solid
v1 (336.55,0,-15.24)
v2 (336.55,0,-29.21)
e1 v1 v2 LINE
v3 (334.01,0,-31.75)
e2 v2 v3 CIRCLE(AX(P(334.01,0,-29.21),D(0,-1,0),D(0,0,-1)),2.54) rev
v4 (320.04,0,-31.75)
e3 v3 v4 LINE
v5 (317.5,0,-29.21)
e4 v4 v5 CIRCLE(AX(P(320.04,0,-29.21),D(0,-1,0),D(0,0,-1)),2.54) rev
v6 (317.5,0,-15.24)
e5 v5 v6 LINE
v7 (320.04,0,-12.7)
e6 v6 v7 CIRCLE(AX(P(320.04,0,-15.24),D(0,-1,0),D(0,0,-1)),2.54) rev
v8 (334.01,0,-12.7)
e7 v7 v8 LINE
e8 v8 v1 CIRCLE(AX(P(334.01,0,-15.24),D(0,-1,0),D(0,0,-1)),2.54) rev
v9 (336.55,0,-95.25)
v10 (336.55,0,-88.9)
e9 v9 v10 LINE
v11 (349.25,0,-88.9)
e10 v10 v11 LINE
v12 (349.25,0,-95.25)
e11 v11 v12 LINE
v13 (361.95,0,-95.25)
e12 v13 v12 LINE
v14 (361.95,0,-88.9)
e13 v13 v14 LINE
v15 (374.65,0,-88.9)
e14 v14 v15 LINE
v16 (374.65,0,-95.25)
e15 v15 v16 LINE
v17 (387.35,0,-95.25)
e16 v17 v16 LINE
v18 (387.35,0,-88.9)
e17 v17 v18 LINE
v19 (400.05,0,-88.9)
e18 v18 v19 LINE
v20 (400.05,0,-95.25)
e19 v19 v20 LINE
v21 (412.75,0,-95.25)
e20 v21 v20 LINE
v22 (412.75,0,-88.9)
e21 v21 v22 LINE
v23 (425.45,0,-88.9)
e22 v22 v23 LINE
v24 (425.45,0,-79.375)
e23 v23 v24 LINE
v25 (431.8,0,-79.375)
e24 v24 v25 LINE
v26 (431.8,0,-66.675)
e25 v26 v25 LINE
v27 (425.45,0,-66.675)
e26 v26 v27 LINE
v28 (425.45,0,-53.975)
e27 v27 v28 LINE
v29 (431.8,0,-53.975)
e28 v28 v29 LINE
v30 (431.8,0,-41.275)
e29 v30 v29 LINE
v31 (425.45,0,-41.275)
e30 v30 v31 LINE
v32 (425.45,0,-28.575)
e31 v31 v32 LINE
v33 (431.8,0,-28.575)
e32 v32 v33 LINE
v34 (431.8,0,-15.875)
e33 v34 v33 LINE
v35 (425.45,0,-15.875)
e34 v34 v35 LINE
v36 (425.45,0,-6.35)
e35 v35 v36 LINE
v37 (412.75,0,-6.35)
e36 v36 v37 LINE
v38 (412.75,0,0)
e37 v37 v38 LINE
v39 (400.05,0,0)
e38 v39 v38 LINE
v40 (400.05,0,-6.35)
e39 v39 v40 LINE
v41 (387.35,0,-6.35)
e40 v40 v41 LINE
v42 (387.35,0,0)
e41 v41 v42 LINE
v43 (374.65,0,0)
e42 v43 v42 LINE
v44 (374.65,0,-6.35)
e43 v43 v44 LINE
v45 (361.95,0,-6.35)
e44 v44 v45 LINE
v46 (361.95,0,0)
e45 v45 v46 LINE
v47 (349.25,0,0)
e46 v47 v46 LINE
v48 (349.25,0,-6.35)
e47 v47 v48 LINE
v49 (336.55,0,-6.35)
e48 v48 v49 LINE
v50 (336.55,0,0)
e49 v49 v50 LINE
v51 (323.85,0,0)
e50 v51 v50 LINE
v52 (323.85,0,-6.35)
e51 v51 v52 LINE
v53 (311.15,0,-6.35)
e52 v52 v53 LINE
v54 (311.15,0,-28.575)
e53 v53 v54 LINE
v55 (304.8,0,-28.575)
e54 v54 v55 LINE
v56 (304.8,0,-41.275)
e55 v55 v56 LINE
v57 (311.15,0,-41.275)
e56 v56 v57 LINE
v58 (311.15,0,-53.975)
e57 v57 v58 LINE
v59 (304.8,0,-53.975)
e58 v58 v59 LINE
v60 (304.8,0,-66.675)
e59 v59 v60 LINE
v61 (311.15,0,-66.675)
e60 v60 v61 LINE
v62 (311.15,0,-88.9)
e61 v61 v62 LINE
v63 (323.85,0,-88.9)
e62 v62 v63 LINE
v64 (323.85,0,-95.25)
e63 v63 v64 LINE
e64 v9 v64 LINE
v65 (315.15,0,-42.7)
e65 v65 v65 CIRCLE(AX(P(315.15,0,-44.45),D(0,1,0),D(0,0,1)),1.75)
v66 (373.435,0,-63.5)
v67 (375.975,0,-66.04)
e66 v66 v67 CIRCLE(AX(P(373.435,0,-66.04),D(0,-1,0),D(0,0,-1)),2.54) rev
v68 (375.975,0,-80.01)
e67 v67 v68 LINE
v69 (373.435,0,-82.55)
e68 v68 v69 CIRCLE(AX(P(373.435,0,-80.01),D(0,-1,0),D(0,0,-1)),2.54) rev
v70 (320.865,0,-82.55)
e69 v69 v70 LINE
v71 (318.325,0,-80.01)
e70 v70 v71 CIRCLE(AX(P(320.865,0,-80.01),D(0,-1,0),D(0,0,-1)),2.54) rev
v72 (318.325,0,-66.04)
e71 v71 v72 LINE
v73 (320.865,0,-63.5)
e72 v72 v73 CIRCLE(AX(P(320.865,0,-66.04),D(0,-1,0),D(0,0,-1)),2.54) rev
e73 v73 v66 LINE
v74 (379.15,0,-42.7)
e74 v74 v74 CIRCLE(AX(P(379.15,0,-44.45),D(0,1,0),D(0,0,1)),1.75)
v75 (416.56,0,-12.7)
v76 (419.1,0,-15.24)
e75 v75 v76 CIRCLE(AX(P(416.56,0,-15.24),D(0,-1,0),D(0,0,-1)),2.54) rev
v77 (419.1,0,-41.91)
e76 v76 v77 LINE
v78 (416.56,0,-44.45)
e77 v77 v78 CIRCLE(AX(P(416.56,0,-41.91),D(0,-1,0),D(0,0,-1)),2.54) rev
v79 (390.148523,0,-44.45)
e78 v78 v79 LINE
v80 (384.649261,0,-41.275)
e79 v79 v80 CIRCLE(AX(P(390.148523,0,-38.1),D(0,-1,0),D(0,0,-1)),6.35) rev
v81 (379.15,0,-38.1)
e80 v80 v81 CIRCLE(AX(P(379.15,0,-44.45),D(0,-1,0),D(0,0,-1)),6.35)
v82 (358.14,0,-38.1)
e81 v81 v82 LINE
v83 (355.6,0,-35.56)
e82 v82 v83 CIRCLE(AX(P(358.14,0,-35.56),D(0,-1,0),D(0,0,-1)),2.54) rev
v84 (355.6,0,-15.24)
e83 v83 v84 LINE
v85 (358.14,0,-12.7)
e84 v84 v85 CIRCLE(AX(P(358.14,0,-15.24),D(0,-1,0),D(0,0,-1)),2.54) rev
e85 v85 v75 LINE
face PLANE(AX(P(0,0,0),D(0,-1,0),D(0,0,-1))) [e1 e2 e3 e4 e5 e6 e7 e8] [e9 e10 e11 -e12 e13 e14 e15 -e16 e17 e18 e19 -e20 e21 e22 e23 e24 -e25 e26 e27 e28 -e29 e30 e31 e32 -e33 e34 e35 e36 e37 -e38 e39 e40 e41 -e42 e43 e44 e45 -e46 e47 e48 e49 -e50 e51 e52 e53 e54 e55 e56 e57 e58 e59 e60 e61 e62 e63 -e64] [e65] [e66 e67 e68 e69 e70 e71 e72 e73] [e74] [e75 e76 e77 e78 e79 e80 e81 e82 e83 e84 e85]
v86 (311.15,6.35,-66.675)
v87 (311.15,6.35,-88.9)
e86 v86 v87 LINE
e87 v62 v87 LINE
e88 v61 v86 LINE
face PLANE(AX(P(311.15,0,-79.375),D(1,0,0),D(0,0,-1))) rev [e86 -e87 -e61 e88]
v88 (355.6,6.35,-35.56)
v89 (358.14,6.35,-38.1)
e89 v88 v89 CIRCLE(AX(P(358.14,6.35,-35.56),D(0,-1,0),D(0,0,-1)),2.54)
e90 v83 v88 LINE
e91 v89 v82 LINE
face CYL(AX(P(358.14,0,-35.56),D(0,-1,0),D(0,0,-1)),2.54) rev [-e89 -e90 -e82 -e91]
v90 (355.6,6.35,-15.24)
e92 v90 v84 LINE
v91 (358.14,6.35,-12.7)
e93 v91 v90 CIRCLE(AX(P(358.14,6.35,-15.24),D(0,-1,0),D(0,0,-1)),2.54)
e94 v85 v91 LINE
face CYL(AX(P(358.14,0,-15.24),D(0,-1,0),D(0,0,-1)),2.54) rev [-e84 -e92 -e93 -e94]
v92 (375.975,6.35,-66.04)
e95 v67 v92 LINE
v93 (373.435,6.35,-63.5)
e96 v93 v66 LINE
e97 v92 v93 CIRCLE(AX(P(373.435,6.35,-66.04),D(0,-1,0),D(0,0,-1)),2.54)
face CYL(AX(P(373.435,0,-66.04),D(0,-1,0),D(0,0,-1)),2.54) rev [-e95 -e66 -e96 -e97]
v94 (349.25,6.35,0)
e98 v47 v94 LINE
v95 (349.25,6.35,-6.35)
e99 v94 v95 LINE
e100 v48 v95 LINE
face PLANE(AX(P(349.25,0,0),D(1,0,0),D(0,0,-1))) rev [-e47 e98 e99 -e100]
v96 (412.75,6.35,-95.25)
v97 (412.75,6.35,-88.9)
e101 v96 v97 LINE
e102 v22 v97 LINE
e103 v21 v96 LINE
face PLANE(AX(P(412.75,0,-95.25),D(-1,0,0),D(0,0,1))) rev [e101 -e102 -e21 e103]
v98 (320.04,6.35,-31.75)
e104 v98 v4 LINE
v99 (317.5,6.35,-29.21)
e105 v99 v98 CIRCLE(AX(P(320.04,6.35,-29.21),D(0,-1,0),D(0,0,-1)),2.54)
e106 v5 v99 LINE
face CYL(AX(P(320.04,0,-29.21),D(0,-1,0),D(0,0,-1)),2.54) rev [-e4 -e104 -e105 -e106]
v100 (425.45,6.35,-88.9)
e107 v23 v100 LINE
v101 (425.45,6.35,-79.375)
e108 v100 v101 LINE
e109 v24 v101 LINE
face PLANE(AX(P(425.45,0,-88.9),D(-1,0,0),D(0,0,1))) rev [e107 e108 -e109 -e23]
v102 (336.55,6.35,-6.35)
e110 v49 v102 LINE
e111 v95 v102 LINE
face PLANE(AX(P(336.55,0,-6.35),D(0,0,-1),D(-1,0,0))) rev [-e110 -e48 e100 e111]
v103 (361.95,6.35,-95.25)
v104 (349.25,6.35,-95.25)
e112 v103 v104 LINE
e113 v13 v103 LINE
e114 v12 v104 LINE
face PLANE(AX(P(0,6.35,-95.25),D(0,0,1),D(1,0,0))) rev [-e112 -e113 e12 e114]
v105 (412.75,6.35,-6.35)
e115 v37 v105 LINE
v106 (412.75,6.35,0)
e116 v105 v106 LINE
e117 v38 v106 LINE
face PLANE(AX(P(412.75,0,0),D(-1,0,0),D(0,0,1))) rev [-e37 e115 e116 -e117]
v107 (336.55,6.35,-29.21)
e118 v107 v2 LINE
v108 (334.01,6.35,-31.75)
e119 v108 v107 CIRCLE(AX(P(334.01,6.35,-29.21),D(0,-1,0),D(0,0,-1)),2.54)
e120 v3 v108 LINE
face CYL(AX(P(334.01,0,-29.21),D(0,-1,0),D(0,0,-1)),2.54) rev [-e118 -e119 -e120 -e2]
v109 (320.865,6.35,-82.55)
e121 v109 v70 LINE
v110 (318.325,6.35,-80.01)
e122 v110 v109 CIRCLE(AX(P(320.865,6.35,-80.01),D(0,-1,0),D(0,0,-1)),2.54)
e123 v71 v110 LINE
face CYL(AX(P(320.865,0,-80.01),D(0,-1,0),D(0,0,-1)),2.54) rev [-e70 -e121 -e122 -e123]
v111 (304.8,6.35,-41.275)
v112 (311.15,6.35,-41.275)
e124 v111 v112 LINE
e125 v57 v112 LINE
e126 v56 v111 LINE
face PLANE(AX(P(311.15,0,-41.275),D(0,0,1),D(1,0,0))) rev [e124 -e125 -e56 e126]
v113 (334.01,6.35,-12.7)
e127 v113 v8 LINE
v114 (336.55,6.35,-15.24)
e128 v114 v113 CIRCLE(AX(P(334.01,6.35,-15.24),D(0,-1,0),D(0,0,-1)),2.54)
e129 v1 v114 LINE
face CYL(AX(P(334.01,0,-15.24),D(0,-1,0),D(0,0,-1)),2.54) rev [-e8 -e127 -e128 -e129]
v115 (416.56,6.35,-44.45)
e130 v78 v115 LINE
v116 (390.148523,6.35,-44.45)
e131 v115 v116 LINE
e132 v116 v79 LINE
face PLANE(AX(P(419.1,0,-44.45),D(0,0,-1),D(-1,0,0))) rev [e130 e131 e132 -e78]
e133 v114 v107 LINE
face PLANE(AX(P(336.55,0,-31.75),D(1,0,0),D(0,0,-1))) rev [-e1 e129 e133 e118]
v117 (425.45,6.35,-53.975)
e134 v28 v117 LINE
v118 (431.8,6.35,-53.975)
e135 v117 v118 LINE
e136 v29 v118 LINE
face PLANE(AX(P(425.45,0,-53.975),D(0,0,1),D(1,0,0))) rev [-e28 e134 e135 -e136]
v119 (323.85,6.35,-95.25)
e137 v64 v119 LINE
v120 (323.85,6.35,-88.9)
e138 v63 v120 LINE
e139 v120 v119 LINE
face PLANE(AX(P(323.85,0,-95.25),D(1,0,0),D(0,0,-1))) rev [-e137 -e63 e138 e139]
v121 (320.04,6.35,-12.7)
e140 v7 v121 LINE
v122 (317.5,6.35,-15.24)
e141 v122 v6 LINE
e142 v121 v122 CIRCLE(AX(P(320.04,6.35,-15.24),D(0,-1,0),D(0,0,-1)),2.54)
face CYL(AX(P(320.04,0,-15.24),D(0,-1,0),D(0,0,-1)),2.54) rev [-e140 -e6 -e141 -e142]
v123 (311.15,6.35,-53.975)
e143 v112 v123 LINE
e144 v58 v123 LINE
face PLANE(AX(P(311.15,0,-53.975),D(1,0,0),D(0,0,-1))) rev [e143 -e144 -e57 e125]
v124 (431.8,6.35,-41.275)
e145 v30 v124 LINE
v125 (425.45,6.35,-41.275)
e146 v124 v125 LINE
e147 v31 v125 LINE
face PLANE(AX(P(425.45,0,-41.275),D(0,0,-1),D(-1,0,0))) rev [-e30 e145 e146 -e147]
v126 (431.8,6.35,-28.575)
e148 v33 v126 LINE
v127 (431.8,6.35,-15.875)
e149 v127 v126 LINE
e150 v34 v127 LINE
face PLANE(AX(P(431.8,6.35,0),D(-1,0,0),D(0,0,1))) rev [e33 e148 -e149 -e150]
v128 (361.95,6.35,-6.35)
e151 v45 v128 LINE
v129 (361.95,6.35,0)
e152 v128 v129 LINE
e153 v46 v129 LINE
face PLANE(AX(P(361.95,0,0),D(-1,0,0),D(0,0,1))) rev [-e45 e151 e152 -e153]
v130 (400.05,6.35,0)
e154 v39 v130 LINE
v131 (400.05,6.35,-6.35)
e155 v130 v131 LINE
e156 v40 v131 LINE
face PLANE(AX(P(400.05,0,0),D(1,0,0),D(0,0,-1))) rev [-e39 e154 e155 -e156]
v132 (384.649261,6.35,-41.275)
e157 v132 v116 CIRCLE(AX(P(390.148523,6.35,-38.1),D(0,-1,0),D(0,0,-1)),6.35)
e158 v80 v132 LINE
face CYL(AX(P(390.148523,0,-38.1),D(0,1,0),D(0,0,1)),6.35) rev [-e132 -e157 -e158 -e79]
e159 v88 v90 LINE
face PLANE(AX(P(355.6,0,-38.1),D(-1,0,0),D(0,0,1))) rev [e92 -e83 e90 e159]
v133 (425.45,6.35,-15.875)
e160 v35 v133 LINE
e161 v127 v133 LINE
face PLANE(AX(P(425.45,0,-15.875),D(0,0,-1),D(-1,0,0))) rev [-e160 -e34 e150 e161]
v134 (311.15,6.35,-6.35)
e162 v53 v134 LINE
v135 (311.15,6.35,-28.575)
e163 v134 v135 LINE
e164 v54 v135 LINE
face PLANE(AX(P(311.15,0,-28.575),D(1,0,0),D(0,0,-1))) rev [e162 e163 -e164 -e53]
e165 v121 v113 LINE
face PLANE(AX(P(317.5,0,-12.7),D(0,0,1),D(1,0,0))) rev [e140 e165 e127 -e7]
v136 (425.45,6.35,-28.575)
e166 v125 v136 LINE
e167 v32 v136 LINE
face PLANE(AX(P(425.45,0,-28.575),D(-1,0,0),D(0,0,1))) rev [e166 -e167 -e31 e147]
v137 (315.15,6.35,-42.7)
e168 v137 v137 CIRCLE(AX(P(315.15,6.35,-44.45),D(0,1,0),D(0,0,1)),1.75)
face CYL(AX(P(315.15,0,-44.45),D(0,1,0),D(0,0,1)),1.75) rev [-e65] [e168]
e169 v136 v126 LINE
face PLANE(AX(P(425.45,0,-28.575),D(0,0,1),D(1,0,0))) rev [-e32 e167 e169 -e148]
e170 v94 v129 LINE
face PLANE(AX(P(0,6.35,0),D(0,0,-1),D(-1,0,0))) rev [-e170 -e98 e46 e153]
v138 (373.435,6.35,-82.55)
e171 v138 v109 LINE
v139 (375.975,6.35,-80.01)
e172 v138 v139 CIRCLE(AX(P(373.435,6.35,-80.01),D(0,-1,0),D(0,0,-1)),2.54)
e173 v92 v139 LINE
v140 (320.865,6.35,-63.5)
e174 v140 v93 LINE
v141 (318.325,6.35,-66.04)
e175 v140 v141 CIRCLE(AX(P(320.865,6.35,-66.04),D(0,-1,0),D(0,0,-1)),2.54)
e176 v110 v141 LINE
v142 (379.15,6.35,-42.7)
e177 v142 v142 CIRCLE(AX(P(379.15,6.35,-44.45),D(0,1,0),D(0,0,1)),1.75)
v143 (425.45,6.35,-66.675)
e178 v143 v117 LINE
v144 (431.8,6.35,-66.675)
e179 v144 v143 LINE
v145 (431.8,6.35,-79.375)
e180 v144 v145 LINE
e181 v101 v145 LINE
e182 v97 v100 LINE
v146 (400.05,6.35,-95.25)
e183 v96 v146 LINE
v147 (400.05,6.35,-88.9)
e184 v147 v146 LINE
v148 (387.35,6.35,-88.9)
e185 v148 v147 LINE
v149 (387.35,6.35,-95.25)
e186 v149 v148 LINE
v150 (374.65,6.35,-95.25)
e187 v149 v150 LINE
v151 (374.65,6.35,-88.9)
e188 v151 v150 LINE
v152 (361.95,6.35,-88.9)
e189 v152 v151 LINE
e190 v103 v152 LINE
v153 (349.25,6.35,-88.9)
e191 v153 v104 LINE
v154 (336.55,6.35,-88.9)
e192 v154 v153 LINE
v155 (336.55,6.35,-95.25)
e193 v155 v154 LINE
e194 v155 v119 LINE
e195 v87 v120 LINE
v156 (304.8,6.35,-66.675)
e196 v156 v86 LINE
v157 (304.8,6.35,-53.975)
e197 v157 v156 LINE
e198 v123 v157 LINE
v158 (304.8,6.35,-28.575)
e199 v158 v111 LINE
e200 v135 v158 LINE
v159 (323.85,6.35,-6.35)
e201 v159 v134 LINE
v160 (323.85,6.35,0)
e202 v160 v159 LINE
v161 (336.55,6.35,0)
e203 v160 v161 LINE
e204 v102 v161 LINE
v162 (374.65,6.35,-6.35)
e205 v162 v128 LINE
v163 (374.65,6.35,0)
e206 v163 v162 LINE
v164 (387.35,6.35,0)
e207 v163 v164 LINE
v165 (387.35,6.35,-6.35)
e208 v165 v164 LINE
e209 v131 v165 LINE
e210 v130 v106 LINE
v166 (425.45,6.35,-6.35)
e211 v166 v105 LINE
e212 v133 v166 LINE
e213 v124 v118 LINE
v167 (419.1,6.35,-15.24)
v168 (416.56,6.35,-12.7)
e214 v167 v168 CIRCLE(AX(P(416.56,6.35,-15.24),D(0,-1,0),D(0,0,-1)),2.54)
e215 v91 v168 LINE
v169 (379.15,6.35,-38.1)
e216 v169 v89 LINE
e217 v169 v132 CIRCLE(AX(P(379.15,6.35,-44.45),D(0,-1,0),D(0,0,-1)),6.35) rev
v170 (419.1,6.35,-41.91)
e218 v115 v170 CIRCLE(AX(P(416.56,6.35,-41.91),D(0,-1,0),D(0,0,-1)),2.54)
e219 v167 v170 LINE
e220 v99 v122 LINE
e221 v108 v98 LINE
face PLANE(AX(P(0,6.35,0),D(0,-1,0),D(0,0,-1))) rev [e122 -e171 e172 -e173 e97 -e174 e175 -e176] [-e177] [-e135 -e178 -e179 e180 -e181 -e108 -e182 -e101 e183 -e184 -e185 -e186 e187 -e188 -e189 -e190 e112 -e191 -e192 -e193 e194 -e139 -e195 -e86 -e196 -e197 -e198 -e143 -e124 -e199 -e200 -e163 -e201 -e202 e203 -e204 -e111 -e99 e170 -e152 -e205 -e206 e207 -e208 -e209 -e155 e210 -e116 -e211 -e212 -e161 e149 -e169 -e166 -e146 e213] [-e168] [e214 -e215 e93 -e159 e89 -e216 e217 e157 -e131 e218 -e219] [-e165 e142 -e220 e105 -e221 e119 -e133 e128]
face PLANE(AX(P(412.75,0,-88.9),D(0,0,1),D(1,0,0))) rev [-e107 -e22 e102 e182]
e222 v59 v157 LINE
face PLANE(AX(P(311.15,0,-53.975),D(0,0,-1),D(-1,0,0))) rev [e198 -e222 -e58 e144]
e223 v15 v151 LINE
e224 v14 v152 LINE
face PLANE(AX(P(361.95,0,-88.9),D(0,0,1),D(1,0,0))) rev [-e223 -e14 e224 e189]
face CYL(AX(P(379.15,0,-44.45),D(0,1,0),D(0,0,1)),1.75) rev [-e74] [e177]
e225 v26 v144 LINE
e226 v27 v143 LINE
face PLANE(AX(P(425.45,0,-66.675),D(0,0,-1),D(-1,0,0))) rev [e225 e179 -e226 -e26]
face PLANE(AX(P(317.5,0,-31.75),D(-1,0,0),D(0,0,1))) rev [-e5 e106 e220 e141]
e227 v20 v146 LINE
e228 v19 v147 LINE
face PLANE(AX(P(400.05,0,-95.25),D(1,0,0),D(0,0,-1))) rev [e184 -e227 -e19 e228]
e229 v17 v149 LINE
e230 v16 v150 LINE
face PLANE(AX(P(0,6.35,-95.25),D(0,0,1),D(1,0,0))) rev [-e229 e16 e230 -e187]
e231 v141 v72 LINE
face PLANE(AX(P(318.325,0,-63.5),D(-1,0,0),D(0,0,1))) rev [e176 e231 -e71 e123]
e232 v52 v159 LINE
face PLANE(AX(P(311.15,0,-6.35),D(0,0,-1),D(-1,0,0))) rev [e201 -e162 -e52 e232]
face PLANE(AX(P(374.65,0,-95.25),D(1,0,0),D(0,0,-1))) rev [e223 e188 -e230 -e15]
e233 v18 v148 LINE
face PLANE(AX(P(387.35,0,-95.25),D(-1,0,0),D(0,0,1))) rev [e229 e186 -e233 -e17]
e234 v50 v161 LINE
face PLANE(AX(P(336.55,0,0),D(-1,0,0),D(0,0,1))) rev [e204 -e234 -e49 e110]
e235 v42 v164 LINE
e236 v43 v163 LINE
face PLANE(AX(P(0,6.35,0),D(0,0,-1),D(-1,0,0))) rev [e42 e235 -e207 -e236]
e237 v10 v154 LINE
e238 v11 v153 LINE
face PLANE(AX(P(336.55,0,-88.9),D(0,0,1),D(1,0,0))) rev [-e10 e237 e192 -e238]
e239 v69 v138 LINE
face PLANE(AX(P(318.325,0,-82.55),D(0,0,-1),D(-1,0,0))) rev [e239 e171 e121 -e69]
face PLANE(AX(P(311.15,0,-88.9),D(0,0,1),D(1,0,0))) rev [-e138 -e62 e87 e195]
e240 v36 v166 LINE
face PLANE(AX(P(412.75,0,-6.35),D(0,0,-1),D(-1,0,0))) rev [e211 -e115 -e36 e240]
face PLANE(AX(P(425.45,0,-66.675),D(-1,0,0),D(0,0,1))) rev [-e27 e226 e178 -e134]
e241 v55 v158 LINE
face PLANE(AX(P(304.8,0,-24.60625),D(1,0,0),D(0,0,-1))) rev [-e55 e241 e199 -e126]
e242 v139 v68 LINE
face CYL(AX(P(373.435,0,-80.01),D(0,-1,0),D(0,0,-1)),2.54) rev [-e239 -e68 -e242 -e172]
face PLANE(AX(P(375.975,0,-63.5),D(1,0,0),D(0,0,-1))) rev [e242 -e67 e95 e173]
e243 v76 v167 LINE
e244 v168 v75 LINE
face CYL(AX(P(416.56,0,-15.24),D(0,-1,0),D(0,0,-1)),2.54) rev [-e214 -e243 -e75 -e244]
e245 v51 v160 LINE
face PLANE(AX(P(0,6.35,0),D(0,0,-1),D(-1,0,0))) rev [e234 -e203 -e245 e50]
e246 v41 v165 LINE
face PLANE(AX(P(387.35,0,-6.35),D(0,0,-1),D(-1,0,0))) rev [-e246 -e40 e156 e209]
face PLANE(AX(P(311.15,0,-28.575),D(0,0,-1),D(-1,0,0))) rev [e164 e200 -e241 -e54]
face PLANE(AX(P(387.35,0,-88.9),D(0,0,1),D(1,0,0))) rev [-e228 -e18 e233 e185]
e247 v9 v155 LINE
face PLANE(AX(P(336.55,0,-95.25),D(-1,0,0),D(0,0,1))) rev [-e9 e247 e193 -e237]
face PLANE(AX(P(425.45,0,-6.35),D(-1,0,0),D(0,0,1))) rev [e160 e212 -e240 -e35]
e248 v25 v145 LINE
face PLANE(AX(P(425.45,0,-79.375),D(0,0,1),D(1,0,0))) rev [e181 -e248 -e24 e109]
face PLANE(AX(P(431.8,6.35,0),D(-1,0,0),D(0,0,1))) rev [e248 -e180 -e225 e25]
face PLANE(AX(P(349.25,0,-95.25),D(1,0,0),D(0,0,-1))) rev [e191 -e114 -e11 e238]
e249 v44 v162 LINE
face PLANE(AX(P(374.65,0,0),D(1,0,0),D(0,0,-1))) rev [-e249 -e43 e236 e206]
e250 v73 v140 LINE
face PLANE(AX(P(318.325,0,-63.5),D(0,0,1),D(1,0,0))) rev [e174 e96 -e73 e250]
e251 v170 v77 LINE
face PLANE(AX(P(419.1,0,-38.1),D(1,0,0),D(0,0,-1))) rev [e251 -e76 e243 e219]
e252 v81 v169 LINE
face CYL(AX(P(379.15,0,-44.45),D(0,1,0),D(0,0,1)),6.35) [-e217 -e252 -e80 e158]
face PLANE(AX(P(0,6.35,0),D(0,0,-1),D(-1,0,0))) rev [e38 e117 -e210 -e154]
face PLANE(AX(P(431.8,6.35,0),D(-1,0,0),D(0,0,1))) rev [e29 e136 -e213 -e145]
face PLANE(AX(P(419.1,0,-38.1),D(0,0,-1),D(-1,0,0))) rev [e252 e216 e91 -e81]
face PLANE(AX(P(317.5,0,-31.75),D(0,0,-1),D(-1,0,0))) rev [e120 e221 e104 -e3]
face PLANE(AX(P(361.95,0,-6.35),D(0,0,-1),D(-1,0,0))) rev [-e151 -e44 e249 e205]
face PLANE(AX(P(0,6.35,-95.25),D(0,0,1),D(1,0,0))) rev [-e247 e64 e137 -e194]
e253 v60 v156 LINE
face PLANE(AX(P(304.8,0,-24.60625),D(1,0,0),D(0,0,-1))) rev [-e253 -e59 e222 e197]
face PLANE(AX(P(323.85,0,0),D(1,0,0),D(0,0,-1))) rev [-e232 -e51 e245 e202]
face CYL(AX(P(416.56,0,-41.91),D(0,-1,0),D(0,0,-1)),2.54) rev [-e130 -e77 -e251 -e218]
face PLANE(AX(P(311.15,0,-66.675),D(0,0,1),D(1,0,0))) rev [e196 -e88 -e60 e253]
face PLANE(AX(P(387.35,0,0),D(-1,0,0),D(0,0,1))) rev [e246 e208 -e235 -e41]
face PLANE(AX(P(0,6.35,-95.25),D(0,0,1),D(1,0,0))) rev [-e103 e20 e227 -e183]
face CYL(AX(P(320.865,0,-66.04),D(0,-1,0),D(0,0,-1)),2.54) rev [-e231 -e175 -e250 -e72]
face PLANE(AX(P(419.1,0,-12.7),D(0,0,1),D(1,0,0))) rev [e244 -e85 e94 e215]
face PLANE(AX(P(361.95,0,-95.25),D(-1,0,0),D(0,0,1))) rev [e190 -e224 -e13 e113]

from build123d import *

# Parameters (mm, degrees)
SKETCH1_W           = 431.8
SKETCH1_H           = 95.25
BOSS_EXTRUDE1_DEPTH = 6.35
SKETCH2_W           = 12.7
SKETCH2_H           = 6.35
CUT_EXTRUDE1_DEPTH  = 443.226327801
LPATTERN1_COUNT     = 17
LPATTERN1_PITCH     = 25.4
SKETCH3_W           = 6.35
SKETCH3_H           = 6.35
CUT_EXTRUDE2_DEPTH  = 443.226327801
SKETCH5_W           = 6.35
SKETCH5_H           = 12.7
CUT_EXTRUDE4_DEPTH  = 443.226327801
LPATTERN2_COUNT     = 2
LPATTERN2_PITCH     = 25.4
LPATTERN2_COL_COUNT = 2
LPATTERN2_COL_PITCH = 25.4
SKETCH6_W           = 114.3
SKETCH6_H           = 46.0375
CUT_EXTRUDE5_DEPTH  = 443.226327801
SKETCH7_R           = 1.75
CUT_EXTRUDE6_DEPTH  = 443.226327801
SKETCH8_W           = 6.35
SKETCH8_H           = 9.525
SKETCH8_H_2         = 12.7
CUT_EXTRUDE7_DEPTH  = 443.226327801
LPATTERN3_COUNT     = 2
LPATTERN3_PITCH     = 425.45
SKETCH9_W           = 304.8
SKETCH9_H           = 95.25
CUT_EXTRUDE8_DEPTH  = 443.226327801
SKETCH10_W          = 6.35
SKETCH10_H          = 15.875
CUT_EXTRUDE9_DEPTH  = 443.226327801
SKETCH11_W          = 57.65
SKETCH11_H          = 19.05
CUT_EXTRUDE10_DEPTH = 443.226327801
SKETCH12_W          = 63.5
SKETCH12_H          = 25.4
CUT_EXTRUDE11_DEPTH = 443.226327801
SKETCH13_W          = 19.05
SKETCH13_H          = 19.05
CUT_EXTRUDE12_DEPTH = 443.226327801
SKETCH14_W          = 33.6
SKETCH14_H          = 6.35
CUT_EXTRUDE13_DEPTH = 443.226327801
FILLET1_R           = 6.35
FILLET2_R           = 6.35
FILLET3_R           = 2.54


with BuildPart() as part:
    # Sketch1 → Boss-Extrude1 (new body)
    with BuildSketch(Plane(origin=(0, 0, 0), x_dir=(1, 0, 0), z_dir=(0, 1, 0))):
        with Locations((215.9, 47.625)):
            Rectangle(SKETCH1_W, SKETCH1_H)
    extrude(amount=BOSS_EXTRUDE1_DEPTH)

    # Sketch2 → Cut-Extrude1 (cut, through all)
    with BuildSketch(Plane(origin=(0, 6.35, 0), x_dir=(1, 0, 0), z_dir=(0, 1, 0))):
        with Locations((12.7, 92.075)):
            Rectangle(SKETCH2_W, SKETCH2_H)
        with Locations((12.7, 3.175)):
            Rectangle(SKETCH2_W, SKETCH2_H)
    cut_extrude1 = extrude(amount=-CUT_EXTRUDE1_DEPTH, mode=Mode.SUBTRACT)

    # LPattern1: Cut-Extrude1 ×17
    with Locations(*[(i * LPATTERN1_PITCH, 0, 0) for i in range(1, LPATTERN1_COUNT)]):
        add(cut_extrude1, mode=Mode.SUBTRACT)

    # Sketch3 → Cut-Extrude2 (cut, through all)
    with BuildSketch(Plane(origin=(0, 6.35, 0), x_dir=(1, 0, 0), z_dir=(0, 1, 0))):
        with Locations((3.175, 92.075)):
            Rectangle(SKETCH3_W, SKETCH3_H)
        with Locations((3.175, 3.175)):
            Rectangle(SKETCH3_W, SKETCH3_H)
        with Locations((428.625, 92.075)):
            Rectangle(SKETCH3_W, SKETCH3_H)
        with Locations((428.625, 3.175)):
            Rectangle(SKETCH3_W, SKETCH3_H)
    extrude(amount=-CUT_EXTRUDE2_DEPTH, mode=Mode.SUBTRACT)

    # Sketch5 → Cut-Extrude4 (cut, through all)
    with BuildSketch(Plane(origin=(0, 6.35, 0), x_dir=(1, 0, 0), z_dir=(0, 1, 0))):
        with Locations((187.325, 47.625)):
            Rectangle(SKETCH5_W, SKETCH5_H)
        with Locations((307.975, 47.625)):
            Rectangle(SKETCH5_W, SKETCH5_H)
    cut_extrude4 = extrude(amount=-CUT_EXTRUDE4_DEPTH, mode=Mode.SUBTRACT)

    # LPattern2: Cut-Extrude4 ×2
    with Locations(*[(0, 0, -i * LPATTERN2_PITCH) for i in range(1, LPATTERN2_COUNT)]):
        add(cut_extrude4, mode=Mode.SUBTRACT)

    # LPattern2 col: Cut-Extrude4 ×2
    with Locations(*[(0, 0, i * LPATTERN2_COL_PITCH) for i in range(1, LPATTERN2_COL_COUNT)]):
        add(cut_extrude4, mode=Mode.SUBTRACT)

    # Sketch6 → Cut-Extrude5 (cut, through all)
    with BuildSketch(Plane(origin=(0, 6.35, 0), x_dir=(1, 0, 0), z_dir=(0, 1, 0))):
        with Locations((247.65, 47.625)):
            Rectangle(SKETCH6_W, SKETCH6_H)
    extrude(amount=-CUT_EXTRUDE5_DEPTH, mode=Mode.SUBTRACT)

    # Sketch7 → Cut-Extrude6 (cut, through all)
    with BuildSketch(Plane(origin=(0, 6.35, 0), x_dir=(1, 0, 0), z_dir=(0, 1, 0))):
        with Locations(Location((52.65, 44.45, 0), (0, 0, 270))):
            Circle(SKETCH7_R)
        with Locations(Location((116.65, 44.45, 0), (0, 0, 270))):
            Circle(SKETCH7_R)
        with Locations(Location((315.15, 44.45, 0), (0, 0, 270))):
            Circle(SKETCH7_R)
        with Locations(Location((379.15, 44.45, 0), (0, 0, 270))):
            Circle(SKETCH7_R)
    extrude(amount=-CUT_EXTRUDE6_DEPTH, mode=Mode.SUBTRACT)

    # Sketch8 → Cut-Extrude7 (cut, through all)
    with BuildSketch(Plane(origin=(0, 6.35, 0), x_dir=(1, 0, 0), z_dir=(0, 1, 0))):
        with Locations((3.175, 84.1375)):
            Rectangle(SKETCH8_W, SKETCH8_H)
        with Locations((3.175, 11.1125)):
            Rectangle(SKETCH8_W, SKETCH8_H)
        with Locations((3.175, 34.925)):
            Rectangle(SKETCH8_W, SKETCH8_H_2)
        with Locations((3.175, 60.325)):
            Rectangle(SKETCH8_W, SKETCH8_H_2)
    cut_extrude7 = extrude(amount=-CUT_EXTRUDE7_DEPTH, mode=Mode.SUBTRACT)

    # LPattern3: Cut-Extrude7 ×2
    with Locations(*[(i * LPATTERN3_PITCH, 0, 0) for i in range(1, LPATTERN3_COUNT)]):
        add(cut_extrude7, mode=Mode.SUBTRACT)

    # Sketch9 → Cut-Extrude8 (cut, through all)
    with BuildSketch(Plane(origin=(0, 6.35, 0), x_dir=(1, 0, 0), z_dir=(0, 1, 0))):
        with Locations((152.4, 47.625)):
            Rectangle(SKETCH9_W, SKETCH9_H)
    extrude(amount=-CUT_EXTRUDE8_DEPTH, mode=Mode.SUBTRACT)

    # Sketch10 → Cut-Extrude9 (cut, through all)
    with BuildSketch(Plane(origin=(0, 6.35, 0), x_dir=(1, 0, 0), z_dir=(0, 1, 0))):
        with Locations((307.975, 87.3125)):
            Rectangle(SKETCH10_W, SKETCH10_H)
        with Locations((307.975, 7.9375)):
            Rectangle(SKETCH10_W, SKETCH10_H)
    extrude(amount=-CUT_EXTRUDE9_DEPTH, mode=Mode.SUBTRACT)

    # Sketch11 → Cut-Extrude10 (cut, through all)
    with BuildSketch(Plane(origin=(0, 6.35, 0), x_dir=(1, 0, 0), z_dir=(0, 1, 0))):
        with Locations((347.15, 73.025)):
            Rectangle(SKETCH11_W, SKETCH11_H)
    extrude(amount=-CUT_EXTRUDE10_DEPTH, mode=Mode.SUBTRACT)

    # Sketch12 → Cut-Extrude11 (cut, through all)
    with BuildSketch(Plane(origin=(0, 6.35, 0), x_dir=(1, 0, 0), z_dir=(0, 1, 0))):
        with Locations((387.35, 25.4)):
            Rectangle(SKETCH12_W, SKETCH12_H)
    extrude(amount=-CUT_EXTRUDE11_DEPTH, mode=Mode.SUBTRACT)

    # Sketch13 → Cut-Extrude12 (cut, through all)
    with BuildSketch(Plane(origin=(0, 6.35, 0), x_dir=(1, 0, 0), z_dir=(0, 1, 0))):
        with Locations((327.025, 22.225)):
            Rectangle(SKETCH13_W, SKETCH13_H)
    extrude(amount=-CUT_EXTRUDE12_DEPTH, mode=Mode.SUBTRACT)

    # Sketch14 → Cut-Extrude13 (cut, through all)
    with BuildSketch(Plane(origin=(0, 6.35, 0), x_dir=(1, 0, 0), z_dir=(0, 1, 0))):
        with Locations((402.3, 41.275)):
            Rectangle(SKETCH14_W, SKETCH14_H)
    extrude(amount=-CUT_EXTRUDE13_DEPTH, mode=Mode.SUBTRACT)

    # Fillet1
    fillet1_edges = [part.edges().sort_by_distance(p)[0] for p in [
        (385.5, 3.175, -38.1),
    ]]
    fillet(fillet1_edges, radius=FILLET1_R - 0.0001)  # a hair under: the kernel refuses the full size

    # Fillet2
    fillet2_edges = [part.edges().sort_by_distance(p)[0] for p in [
        (385.5, 3.175, -44.45),
    ]]
    fillet(fillet2_edges, radius=FILLET2_R)

    # Fillet3
    fillet3_edges = [part.edges().sort_by_distance(p)[0] for p in [
        (318.325, 3.175, -63.5),
        (318.325, 3.175, -82.55),
        (375.975, 3.175, -82.55),
        (375.975, 3.175, -63.5),
        (419.1, 3.175, -12.7),
        (355.6, 3.175, -12.7),
        (355.6, 3.175, -38.1),
        (317.5, 3.175, -12.7),
        (317.5, 3.175, -31.75),
        (336.55, 3.175, -31.75),
        (336.55, 3.175, -12.7),
        (419.1, 3.175, -44.45),
    ]]
    fillet(fillet3_edges, radius=FILLET3_R)


solid = part.part
